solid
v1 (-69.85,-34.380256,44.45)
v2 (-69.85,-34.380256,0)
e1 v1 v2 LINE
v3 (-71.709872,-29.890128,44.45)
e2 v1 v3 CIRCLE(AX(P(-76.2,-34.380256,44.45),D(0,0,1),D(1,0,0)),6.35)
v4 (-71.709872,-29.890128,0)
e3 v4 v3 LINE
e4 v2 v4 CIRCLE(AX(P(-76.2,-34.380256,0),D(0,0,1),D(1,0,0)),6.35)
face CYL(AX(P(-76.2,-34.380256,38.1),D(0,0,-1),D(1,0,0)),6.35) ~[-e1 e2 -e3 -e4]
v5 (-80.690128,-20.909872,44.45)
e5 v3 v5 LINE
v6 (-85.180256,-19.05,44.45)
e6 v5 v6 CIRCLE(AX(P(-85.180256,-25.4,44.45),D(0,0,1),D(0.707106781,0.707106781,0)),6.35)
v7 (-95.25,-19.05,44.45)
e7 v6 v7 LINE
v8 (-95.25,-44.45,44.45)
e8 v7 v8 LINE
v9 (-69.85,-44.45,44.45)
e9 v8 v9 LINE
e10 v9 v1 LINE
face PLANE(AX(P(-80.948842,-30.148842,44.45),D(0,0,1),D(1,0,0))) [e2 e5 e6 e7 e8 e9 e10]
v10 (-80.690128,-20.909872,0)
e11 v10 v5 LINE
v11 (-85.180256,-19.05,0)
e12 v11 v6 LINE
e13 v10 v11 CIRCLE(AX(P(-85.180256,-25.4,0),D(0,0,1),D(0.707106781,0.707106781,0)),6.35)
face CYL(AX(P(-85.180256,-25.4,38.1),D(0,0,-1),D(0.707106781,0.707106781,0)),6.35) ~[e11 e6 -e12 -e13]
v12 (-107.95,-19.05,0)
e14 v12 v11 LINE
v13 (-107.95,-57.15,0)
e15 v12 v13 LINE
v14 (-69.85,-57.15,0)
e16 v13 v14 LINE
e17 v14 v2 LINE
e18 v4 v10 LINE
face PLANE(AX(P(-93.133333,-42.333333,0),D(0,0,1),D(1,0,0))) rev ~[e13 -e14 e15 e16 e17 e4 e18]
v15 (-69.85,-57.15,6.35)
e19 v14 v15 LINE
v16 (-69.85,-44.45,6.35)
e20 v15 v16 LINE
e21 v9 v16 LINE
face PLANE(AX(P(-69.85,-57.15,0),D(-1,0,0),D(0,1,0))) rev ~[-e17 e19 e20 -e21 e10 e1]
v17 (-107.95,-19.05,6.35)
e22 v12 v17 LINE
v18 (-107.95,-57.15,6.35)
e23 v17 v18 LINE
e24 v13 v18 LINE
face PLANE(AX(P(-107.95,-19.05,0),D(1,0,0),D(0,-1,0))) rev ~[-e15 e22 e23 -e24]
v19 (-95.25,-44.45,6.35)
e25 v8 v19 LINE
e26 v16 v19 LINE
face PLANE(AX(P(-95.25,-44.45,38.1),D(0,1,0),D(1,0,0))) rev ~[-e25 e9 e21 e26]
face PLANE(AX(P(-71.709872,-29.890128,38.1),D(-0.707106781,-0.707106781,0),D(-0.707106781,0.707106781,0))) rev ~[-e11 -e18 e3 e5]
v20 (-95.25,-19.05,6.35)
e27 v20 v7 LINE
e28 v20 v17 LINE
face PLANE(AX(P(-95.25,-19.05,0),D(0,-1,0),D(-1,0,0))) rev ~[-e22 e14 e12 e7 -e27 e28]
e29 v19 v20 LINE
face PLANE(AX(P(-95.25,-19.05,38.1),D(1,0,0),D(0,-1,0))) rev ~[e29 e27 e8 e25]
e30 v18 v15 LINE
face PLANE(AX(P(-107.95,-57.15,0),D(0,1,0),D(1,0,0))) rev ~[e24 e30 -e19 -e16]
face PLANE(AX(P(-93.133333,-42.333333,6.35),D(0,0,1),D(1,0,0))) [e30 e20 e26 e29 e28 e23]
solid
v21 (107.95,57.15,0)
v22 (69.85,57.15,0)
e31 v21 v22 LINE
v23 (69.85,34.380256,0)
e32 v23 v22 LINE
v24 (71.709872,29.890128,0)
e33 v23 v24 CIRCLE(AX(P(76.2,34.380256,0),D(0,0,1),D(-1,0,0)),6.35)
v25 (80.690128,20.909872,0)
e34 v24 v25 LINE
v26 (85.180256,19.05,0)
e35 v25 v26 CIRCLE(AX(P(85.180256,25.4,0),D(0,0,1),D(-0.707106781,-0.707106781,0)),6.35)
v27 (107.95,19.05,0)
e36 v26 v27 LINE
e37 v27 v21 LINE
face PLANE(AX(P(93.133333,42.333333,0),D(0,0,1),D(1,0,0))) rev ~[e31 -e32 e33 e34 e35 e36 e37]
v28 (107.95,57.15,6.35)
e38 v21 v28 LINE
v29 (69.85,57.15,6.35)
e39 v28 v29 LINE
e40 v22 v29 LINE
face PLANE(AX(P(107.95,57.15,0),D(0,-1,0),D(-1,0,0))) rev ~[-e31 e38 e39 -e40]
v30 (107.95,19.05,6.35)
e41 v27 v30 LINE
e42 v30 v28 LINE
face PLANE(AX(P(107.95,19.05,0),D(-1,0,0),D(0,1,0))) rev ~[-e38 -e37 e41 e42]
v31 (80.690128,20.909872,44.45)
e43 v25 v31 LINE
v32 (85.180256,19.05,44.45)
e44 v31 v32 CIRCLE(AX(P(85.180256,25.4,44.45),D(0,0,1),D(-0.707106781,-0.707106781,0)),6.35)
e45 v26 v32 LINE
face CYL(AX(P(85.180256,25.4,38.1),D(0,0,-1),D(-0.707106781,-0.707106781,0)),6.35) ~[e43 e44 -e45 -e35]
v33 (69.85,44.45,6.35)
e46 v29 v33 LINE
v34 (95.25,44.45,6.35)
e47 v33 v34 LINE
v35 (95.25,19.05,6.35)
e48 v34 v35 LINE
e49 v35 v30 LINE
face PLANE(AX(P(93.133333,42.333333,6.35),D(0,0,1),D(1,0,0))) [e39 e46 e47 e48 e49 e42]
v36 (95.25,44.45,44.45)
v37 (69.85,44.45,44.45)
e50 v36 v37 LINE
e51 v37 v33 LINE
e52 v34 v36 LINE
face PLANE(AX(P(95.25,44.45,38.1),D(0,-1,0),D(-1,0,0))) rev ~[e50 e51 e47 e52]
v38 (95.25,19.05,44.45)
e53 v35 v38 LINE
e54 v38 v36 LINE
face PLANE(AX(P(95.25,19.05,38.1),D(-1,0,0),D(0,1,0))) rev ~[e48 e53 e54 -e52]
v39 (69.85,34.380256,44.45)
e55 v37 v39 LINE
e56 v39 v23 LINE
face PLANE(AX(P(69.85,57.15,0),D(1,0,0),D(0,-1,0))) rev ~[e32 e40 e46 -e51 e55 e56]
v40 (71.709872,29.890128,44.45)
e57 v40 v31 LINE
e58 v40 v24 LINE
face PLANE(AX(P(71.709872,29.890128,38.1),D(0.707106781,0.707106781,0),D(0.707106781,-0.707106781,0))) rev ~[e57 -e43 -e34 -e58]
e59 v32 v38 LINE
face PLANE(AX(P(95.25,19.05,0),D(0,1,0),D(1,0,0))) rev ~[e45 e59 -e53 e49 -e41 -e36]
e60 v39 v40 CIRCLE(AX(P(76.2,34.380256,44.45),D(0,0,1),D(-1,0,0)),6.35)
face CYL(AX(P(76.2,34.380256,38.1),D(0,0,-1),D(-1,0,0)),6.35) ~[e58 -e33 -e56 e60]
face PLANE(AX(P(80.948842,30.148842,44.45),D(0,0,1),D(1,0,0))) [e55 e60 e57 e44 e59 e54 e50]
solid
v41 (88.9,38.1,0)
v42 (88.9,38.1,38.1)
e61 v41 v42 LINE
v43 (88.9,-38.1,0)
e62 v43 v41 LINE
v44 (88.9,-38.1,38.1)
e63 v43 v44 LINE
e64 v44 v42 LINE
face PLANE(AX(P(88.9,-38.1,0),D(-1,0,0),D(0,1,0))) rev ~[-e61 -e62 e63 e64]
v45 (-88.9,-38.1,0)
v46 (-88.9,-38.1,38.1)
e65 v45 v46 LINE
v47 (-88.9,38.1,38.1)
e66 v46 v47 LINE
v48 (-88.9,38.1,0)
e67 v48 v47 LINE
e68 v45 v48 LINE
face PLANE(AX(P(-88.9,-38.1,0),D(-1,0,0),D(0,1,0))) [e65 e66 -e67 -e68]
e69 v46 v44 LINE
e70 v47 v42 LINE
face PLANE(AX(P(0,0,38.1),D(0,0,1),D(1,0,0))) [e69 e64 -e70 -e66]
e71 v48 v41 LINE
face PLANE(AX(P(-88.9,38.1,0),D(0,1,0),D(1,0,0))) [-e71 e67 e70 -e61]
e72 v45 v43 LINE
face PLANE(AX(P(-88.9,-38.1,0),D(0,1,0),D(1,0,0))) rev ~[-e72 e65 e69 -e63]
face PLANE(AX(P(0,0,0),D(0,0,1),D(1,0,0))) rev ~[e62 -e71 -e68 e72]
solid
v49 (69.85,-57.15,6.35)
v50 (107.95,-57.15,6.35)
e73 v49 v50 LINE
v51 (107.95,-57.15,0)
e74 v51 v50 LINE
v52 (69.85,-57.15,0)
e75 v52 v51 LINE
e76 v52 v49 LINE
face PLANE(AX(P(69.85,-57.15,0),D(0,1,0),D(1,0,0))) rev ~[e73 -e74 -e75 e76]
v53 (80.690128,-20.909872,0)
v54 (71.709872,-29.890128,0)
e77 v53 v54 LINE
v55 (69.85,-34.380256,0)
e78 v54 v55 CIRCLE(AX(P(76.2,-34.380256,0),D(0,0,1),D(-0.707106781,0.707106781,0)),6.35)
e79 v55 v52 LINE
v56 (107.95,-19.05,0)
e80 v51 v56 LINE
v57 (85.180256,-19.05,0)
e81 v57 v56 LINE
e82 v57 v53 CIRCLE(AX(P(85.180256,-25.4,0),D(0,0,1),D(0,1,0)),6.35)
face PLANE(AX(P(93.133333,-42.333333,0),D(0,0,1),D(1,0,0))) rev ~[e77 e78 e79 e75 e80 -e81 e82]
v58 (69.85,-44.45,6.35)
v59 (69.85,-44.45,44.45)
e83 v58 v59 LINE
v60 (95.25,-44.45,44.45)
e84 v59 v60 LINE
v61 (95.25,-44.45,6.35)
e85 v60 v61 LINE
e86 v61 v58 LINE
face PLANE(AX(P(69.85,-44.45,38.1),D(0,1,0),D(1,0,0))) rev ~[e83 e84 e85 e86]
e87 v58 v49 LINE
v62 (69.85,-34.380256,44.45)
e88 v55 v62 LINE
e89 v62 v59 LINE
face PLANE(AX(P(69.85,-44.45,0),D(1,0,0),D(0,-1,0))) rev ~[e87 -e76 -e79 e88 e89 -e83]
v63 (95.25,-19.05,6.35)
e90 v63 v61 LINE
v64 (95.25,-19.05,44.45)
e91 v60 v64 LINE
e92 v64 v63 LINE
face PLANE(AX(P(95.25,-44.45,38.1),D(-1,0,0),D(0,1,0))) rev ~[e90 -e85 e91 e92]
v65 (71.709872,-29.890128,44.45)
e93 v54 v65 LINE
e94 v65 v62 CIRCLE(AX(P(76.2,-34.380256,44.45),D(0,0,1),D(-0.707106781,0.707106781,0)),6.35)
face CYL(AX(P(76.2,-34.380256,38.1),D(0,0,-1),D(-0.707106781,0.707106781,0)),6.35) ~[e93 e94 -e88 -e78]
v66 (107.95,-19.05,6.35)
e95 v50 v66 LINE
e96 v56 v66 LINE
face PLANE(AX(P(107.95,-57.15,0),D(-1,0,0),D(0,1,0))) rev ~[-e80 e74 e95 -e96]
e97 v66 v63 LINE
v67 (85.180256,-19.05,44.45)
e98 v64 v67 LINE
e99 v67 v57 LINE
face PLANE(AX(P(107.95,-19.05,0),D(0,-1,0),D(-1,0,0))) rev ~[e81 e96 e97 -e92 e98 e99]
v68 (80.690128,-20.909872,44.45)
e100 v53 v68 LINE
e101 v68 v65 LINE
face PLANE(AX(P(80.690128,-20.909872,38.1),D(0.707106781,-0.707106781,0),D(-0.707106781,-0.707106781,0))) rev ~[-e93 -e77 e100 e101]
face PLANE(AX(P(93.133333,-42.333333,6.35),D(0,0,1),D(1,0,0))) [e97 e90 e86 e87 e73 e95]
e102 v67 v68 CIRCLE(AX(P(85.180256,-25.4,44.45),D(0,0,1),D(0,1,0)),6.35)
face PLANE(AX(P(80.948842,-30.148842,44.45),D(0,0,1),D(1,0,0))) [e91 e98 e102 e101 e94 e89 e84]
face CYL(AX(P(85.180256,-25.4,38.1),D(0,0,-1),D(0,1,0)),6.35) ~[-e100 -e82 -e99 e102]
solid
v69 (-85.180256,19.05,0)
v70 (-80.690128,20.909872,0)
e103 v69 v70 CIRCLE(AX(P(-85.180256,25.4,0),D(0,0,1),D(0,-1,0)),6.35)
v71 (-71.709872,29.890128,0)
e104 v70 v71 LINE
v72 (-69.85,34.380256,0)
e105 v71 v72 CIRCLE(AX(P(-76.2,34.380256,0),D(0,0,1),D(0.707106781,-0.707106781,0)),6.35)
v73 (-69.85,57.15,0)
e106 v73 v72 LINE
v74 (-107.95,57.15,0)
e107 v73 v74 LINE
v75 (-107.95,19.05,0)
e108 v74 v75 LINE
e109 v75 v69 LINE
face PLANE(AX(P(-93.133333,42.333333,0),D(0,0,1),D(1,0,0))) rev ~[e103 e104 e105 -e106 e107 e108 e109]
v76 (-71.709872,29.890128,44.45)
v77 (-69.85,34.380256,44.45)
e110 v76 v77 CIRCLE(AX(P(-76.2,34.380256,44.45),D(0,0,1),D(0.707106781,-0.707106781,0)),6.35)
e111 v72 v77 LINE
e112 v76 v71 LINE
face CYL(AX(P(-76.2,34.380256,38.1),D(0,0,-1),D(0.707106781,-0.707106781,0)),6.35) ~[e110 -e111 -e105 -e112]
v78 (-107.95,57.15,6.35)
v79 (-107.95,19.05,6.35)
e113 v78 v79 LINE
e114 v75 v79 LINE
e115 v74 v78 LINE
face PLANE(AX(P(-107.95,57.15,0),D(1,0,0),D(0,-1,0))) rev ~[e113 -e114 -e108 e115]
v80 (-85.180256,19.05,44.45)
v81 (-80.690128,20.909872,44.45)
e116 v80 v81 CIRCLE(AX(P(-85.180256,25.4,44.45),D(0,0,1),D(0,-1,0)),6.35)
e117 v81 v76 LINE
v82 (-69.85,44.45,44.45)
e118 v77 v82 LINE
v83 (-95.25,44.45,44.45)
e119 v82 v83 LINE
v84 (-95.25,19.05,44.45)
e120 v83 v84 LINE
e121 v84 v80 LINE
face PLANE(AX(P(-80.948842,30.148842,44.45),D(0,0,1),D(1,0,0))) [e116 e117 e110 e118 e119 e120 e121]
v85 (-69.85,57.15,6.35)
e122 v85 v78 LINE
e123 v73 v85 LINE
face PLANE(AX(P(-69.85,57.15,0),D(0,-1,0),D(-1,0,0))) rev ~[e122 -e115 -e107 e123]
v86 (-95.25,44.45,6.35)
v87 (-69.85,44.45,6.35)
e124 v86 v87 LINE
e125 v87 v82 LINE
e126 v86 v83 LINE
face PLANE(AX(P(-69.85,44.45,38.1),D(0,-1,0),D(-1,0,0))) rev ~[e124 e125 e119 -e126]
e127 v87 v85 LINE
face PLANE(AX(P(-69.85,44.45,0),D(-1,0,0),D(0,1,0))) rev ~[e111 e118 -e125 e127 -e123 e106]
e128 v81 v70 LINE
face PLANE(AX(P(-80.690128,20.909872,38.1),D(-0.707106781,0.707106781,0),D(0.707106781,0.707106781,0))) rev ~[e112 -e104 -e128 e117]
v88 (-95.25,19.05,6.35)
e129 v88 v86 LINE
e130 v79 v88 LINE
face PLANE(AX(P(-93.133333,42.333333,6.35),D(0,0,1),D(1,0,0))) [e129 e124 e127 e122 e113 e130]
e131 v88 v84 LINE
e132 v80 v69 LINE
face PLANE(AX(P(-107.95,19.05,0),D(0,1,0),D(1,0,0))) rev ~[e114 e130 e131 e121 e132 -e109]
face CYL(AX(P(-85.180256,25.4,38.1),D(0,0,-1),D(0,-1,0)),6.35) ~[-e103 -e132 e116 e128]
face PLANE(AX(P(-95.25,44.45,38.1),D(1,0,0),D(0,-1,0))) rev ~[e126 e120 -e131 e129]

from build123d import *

# Parameters (mm, degrees)
F0_W     = 177.8
F0_H     = 76.2
F1_DEPTH = 38.1
F3_DEPTH = 38.1
F5_DEPTH = 6.35
F6_DEPTH = 6.35


with BuildPart() as f1:
    # F0 (on Top) → F1 (new body)
    with BuildSketch(Plane.XY):
        Rectangle(F0_W, F0_H)
    extrude(amount=F1_DEPTH)


with BuildPart() as f3:
    # F2 (on Top) → F3 (new body, through all)
    with BuildSketch(Plane.XY):
        Polygon((-69.85, -38.1), (-88.9, -38.1), (-88.9, -19.05), (-95.25, -19.05), (-95.25, -44.45), (-69.85, -44.45), align=None)
        with BuildLine():
            Line((-88.9, -19.05), (-88.9, -38.1))
            Line((-88.9, -38.1), (-69.85, -38.1))
            Line((-69.85, -38.1), (-69.85, -34.3802561211))
            ThreePointArc((-69.85, -34.3802561211), (-70.3333649686, -31.9502163256), (-71.7098719395, -29.8901280605))
            Line((-71.7098719395, -29.8901280605), (-80.6901280605, -20.9098719395))
            ThreePointArc((-80.6901280605, -20.9098719395), (-82.7502163256, -19.5333649686), (-85.1802561211, -19.05))
            Line((-85.1802561211, -19.05), (-88.9, -19.05))
        make_face()
    extrude(amount=F3_DEPTH)

    # F4 (on face) → F5 (join)
    with BuildSketch(Plane.XY.offset(38.1)):
        with BuildLine():
            Line((-88.9, -38.1), (-69.85, -38.1))
            Line((-69.85, -38.1), (-69.85, -34.3802561211))
            ThreePointArc((-69.85, -34.3802561211), (-70.3333649686, -31.9502163256), (-71.7098719395, -29.8901280605))
            Line((-71.7098719395, -29.8901280605), (-80.6901280605, -20.9098719395))
            ThreePointArc((-80.6901280605, -20.9098719395), (-82.7502163256, -19.5333649686), (-85.1802561211, -19.05))
            Line((-85.1802561211, -19.05), (-88.9, -19.05))
            Line((-88.9, -19.05), (-88.9, -38.1))
        make_face()
        Polygon((-69.85, -44.45), (-69.85, -38.1), (-88.9, -38.1), (-88.9, -19.05), (-95.25, -19.05), (-95.25, -44.45), align=None)
    extrude(amount=F5_DEPTH)

    # F2 (on Top) → F6, piece 4 (join)
    with BuildSketch(Plane.XY):
        Polygon((-69.85, -57.15), (-69.85, -44.45), (-95.25, -44.45), (-95.25, -19.05), (-107.95, -19.05), (-107.95, -57.15), align=None)
    extrude(amount=F6_DEPTH)


with BuildPart() as f3b:
    # F2 (on Top) → F3, piece 2 (new body, through all)
    with BuildSketch(Plane.XY):
        with BuildLine():
            Line((-88.9, 38.1), (-88.9, 19.05))
            Line((-88.9, 19.05), (-85.1802561211, 19.05))
            ThreePointArc((-85.1802561211, 19.05), (-82.7502163256, 19.5333649686), (-80.6901280605, 20.9098719395))
            Line((-80.6901280605, 20.9098719395), (-71.7098719395, 29.8901280605))
            ThreePointArc((-71.7098719395, 29.8901280605), (-70.3333649686, 31.9502163256), (-69.85, 34.3802561211))
            Line((-69.85, 34.3802561211), (-69.85, 38.1))
            Line((-69.85, 38.1), (-88.9, 38.1))
        make_face()
        Polygon((-95.25, 19.05), (-88.9, 19.05), (-88.9, 38.1), (-69.85, 38.1), (-69.85, 44.45), (-95.25, 44.45), align=None)
    extrude(amount=F3_DEPTH)

    # F4 (on face) → F5, piece 2 (join)
    with BuildSketch(Plane.XY.offset(38.1)):
        with BuildLine():
            ThreePointArc((-71.7098719395, 29.8901280605), (-70.3333649686, 31.9502163256), (-69.85, 34.3802561211))
            Line((-69.85, 34.3802561211), (-69.85, 38.1))
            Line((-69.85, 38.1), (-88.9, 38.1))
            Line((-88.9, 38.1), (-88.9, 19.05))
            Line((-88.9, 19.05), (-85.1802561211, 19.05))
            ThreePointArc((-85.1802561211, 19.05), (-82.7502163256, 19.5333649686), (-80.6901280605, 20.9098719395))
            Line((-80.6901280605, 20.9098719395), (-71.7098719395, 29.8901280605))
        make_face()
        Polygon((-88.9, 38.1), (-69.85, 38.1), (-69.85, 44.45), (-95.25, 44.45), (-95.25, 19.05), (-88.9, 19.05), align=None)
    extrude(amount=F5_DEPTH)

    # F2 (on Top) → F6, piece 2 (join)
    with BuildSketch(Plane.XY):
        Polygon((-107.95, 19.05), (-95.25, 19.05), (-95.25, 44.45), (-69.85, 44.45), (-69.85, 57.15), (-107.95, 57.15), align=None)
    extrude(amount=F6_DEPTH)


with BuildPart() as f3c:
    # F2 (on Top) → F3, piece 3 (new body, through all)
    with BuildSketch(Plane.XY):
        with BuildLine():
            Line((69.85, -34.3802561211), (69.85, -38.1))
            Line((69.85, -38.1), (88.9, -38.1))
            Line((88.9, -38.1), (88.9, -19.05))
            Line((88.9, -19.05), (85.1802561211, -19.05))
            ThreePointArc((85.1802561211, -19.05), (82.7502163256, -19.5333649686), (80.6901280605, -20.9098719395))
            Line((80.6901280605, -20.9098719395), (71.7098719395, -29.8901280605))
            ThreePointArc((71.7098719395, -29.8901280605), (70.3333649686, -31.9502163256), (69.85, -34.3802561211))
        make_face()
        Polygon((88.9, -38.1), (69.85, -38.1), (69.85, -44.45), (95.25, -44.45), (95.25, -19.05), (88.9, -19.05), align=None)
    extrude(amount=F3_DEPTH)

    # F4 (on face) → F5, piece 3 (join)
    with BuildSketch(Plane.XY.offset(38.1)):
        with BuildLine():
            Line((88.9, -38.1), (88.9, -19.05))
            Line((88.9, -19.05), (85.1802561211, -19.05))
            ThreePointArc((85.1802561211, -19.05), (82.7502163256, -19.5333649686), (80.6901280605, -20.9098719395))
            Line((80.6901280605, -20.9098719395), (71.7098719395, -29.8901280605))
            ThreePointArc((71.7098719395, -29.8901280605), (70.3333649686, -31.9502163256), (69.85, -34.3802561211))
            Line((69.85, -34.3802561211), (69.85, -38.1))
            Line((69.85, -38.1), (88.9, -38.1))
        make_face()
        Polygon((95.25, -19.05), (88.9, -19.05), (88.9, -38.1), (69.85, -38.1), (69.85, -44.45), (95.25, -44.45), align=None)
    extrude(amount=F5_DEPTH)

    # F2 (on Top) → F6, piece 3 (join)
    with BuildSketch(Plane.XY):
        Polygon((95.25, -44.45), (69.85, -44.45), (69.85, -57.15), (107.95, -57.15), (107.95, -19.05), (95.25, -19.05), align=None)
    extrude(amount=F6_DEPTH)


with BuildPart() as f3d:
    # F2 (on Top) → F3, piece 4 (new body, through all)
    with BuildSketch(Plane.XY):
        with BuildLine():
            Line((85.1802561211, 19.05), (88.9, 19.05))
            Line((88.9, 19.05), (88.9, 38.1))
            Line((88.9, 38.1), (69.85, 38.1))
            Line((69.85, 38.1), (69.85, 34.3802561211))
            ThreePointArc((69.85, 34.3802561211), (70.3333649686, 31.9502163256), (71.7098719395, 29.8901280605))
            Line((71.7098719395, 29.8901280605), (80.6901280605, 20.9098719395))
            ThreePointArc((80.6901280605, 20.9098719395), (82.7502163256, 19.5333649686), (85.1802561211, 19.05))
        make_face()
        Polygon((88.9, 38.1), (88.9, 19.05), (95.25, 19.05), (95.25, 44.45), (69.85, 44.45), (69.85, 38.1), align=None)
    extrude(amount=F3_DEPTH)

    # F4 (on face) → F5, piece 4 (join)
    with BuildSketch(Plane.XY.offset(38.1)):
        with BuildLine():
            Line((71.7098719395, 29.8901280605), (80.6901280605, 20.9098719395))
            ThreePointArc((80.6901280605, 20.9098719395), (82.7502163256, 19.5333649686), (85.1802561211, 19.05))
            Line((85.1802561211, 19.05), (88.9, 19.05))
            Line((88.9, 19.05), (88.9, 38.1))
            Line((88.9, 38.1), (69.85, 38.1))
            Line((69.85, 38.1), (69.85, 34.3802561211))
            ThreePointArc((69.85, 34.3802561211), (70.3333649686, 31.9502163256), (71.7098719395, 29.8901280605))
        make_face()
        Polygon((88.9, 38.1), (88.9, 19.05), (95.25, 19.05), (95.25, 44.45), (69.85, 44.45), (69.85, 38.1), align=None)
    extrude(amount=F5_DEPTH)

    # F2 (on Top) → F6 (join)
    with BuildSketch(Plane.XY):
        Polygon((95.25, 44.45), (95.25, 19.05), (107.95, 19.05), (107.95, 57.15), (69.85, 57.15), (69.85, 44.45), align=None)
    extrude(amount=F6_DEPTH)


solid = Compound([f1.part, f3.part, f3b.part, f3c.part, f3d.part])
